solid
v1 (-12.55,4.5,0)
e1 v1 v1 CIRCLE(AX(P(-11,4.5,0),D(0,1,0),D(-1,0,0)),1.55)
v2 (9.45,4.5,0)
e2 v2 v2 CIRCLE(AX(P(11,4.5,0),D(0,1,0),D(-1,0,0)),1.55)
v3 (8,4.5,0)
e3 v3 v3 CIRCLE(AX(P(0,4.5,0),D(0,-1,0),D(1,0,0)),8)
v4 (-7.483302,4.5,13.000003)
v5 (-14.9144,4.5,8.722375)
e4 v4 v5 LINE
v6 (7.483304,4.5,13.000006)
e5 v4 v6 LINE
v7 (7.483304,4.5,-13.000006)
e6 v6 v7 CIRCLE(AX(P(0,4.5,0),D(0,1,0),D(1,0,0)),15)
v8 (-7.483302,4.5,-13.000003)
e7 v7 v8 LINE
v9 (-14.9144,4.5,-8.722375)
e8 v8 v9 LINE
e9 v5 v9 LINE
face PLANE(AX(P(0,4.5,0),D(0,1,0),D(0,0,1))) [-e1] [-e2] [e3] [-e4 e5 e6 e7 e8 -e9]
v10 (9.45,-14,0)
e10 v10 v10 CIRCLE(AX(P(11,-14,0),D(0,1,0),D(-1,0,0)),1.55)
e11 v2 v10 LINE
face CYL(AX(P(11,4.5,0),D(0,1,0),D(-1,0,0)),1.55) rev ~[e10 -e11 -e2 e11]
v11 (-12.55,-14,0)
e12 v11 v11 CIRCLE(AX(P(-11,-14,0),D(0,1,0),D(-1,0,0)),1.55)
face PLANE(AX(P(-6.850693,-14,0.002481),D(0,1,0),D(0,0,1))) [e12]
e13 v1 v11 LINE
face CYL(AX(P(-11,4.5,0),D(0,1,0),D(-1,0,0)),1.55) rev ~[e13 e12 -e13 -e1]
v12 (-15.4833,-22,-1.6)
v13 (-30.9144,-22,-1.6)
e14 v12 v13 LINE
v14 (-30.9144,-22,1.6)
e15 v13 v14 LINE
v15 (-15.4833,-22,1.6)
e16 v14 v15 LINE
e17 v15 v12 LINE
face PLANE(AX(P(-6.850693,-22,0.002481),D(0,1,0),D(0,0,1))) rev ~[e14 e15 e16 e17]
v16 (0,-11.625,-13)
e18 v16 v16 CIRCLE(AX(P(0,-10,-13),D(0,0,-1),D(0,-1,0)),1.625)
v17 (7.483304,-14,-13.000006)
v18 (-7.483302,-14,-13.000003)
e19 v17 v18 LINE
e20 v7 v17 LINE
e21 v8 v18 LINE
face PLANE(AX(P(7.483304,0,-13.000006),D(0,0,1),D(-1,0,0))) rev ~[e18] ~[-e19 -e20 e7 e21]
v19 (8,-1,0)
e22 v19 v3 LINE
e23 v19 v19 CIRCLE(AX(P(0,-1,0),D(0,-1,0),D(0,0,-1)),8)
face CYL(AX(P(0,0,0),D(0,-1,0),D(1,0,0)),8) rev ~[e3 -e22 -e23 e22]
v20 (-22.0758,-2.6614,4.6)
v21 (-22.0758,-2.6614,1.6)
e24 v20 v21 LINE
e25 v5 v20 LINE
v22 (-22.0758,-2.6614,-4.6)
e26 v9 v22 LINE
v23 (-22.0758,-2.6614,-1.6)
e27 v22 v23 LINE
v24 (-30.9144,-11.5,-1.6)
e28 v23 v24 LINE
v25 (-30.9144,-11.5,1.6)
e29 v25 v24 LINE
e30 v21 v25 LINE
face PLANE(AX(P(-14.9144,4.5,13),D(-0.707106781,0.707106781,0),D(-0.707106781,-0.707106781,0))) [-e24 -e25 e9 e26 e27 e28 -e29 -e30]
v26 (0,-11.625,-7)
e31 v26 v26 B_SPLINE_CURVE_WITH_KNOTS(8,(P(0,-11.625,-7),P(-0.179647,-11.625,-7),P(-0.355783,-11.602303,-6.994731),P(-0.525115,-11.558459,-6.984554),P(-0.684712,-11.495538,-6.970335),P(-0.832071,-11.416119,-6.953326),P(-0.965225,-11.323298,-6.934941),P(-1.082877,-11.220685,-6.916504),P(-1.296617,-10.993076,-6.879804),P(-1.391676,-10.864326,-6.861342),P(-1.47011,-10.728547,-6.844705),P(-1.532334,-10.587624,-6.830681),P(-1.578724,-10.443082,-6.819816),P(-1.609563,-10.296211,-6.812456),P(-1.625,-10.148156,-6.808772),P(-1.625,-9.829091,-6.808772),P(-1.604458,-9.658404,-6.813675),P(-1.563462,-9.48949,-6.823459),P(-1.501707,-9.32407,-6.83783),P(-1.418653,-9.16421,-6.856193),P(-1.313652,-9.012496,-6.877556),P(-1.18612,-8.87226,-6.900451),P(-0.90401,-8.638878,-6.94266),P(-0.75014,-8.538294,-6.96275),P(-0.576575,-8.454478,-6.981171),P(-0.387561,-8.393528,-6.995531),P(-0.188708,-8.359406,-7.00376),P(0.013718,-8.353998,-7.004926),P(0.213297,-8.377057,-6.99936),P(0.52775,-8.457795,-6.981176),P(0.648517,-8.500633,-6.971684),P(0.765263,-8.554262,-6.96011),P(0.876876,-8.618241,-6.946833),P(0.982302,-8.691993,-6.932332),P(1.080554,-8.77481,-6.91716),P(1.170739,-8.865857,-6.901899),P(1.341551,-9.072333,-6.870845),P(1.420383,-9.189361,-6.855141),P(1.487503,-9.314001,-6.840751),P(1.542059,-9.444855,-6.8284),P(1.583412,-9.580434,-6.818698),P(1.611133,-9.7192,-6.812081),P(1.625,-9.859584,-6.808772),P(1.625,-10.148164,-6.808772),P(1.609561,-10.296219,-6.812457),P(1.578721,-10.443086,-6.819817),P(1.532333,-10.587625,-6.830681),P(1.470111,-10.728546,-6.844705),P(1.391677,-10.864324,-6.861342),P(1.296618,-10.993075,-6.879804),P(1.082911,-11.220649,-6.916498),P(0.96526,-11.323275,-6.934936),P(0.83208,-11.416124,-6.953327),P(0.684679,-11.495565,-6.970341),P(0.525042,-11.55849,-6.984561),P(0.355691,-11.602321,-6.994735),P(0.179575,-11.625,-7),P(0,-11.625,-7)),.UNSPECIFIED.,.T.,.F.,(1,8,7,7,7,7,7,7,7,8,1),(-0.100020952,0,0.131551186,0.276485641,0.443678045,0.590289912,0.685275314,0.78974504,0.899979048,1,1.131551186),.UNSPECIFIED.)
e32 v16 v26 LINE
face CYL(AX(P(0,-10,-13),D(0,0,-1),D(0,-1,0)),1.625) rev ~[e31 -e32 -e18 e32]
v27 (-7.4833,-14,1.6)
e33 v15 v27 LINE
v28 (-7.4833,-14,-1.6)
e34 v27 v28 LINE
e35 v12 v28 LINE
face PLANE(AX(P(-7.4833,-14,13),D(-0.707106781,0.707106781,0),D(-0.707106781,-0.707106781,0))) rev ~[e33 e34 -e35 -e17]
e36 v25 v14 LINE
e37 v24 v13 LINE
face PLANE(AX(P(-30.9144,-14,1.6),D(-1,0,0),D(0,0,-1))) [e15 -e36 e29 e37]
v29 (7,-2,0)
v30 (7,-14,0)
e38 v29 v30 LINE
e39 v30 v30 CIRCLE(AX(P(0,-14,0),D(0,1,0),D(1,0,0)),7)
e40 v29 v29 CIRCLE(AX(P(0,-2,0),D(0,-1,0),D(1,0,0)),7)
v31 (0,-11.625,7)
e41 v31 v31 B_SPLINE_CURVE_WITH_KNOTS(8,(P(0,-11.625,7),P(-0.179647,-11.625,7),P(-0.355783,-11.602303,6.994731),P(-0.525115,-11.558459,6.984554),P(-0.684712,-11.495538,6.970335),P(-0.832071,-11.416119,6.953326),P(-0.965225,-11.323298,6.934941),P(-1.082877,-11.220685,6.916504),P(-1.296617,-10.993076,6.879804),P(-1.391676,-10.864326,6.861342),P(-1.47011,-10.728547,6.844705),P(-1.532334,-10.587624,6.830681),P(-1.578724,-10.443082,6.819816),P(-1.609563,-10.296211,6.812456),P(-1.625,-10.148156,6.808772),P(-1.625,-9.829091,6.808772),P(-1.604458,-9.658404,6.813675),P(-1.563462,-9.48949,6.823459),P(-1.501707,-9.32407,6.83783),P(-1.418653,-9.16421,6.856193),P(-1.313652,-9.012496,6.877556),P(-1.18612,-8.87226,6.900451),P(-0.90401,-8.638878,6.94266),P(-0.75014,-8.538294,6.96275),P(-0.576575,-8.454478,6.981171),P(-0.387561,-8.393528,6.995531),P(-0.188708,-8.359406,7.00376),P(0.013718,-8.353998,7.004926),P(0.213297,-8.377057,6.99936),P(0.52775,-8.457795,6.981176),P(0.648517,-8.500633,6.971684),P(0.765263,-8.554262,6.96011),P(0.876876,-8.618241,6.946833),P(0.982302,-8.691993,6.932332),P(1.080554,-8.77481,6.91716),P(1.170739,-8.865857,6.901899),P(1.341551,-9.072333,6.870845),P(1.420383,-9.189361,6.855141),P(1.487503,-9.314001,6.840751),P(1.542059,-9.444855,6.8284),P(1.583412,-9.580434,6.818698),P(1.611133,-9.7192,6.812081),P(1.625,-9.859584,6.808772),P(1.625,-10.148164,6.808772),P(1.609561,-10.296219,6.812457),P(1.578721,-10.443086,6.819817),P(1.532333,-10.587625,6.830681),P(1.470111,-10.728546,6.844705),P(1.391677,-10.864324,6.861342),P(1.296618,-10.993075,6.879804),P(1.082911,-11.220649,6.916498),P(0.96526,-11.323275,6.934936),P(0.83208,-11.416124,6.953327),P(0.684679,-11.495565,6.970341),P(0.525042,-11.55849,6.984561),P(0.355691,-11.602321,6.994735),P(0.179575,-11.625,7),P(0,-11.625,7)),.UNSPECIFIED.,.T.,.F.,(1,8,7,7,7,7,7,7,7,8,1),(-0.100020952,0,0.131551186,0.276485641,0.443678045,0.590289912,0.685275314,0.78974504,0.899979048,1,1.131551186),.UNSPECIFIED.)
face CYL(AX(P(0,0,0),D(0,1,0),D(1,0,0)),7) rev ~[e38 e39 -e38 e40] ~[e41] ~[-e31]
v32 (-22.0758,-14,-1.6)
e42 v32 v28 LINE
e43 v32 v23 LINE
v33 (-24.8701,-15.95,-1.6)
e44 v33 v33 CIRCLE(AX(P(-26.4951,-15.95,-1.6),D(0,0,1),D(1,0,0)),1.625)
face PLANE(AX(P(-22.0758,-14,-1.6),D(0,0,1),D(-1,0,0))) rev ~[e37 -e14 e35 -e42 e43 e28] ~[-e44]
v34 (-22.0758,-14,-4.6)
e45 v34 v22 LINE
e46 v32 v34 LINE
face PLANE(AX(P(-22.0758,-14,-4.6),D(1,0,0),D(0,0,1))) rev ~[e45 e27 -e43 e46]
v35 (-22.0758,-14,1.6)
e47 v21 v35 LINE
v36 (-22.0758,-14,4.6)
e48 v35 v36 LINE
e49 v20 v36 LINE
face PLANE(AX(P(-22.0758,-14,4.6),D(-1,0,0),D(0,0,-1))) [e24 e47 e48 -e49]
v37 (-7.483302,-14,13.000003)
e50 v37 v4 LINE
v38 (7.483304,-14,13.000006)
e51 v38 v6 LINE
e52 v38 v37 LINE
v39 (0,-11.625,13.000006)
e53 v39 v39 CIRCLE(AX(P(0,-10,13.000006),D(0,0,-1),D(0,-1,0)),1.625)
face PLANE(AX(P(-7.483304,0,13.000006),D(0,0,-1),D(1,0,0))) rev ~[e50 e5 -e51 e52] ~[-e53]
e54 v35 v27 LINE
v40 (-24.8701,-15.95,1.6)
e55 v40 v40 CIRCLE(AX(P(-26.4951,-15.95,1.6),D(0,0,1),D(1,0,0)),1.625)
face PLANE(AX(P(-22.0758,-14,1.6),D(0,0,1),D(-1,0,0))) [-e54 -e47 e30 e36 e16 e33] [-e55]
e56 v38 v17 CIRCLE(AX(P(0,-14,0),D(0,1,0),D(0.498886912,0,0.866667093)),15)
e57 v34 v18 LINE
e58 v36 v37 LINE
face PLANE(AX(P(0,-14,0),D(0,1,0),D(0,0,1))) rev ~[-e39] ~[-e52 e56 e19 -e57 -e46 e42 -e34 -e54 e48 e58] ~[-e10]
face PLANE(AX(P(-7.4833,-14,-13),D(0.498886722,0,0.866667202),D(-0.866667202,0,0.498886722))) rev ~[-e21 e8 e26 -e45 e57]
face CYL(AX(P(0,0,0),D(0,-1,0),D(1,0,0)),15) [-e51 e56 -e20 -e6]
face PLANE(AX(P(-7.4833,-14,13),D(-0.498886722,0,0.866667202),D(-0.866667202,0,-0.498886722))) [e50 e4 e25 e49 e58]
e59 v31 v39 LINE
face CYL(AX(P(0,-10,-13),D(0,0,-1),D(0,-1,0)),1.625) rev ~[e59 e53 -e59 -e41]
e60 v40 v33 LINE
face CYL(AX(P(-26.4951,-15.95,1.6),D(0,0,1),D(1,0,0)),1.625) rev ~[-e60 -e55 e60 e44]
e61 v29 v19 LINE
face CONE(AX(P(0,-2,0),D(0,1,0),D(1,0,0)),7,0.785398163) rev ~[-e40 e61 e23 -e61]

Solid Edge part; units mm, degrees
sketch "Sketch1" plane through (0, 0, 0) normal (0, -1, 0) x (1, 0, 0)
  arc A0 (-7.4833, -13) -> (-7.4833, 13) centre (0, 0) cw
  line L0 (-7.4833, 13) -> (7.4833, 13)
  arc A1 (7.4833, 13) -> (7.4833, -13) centre (0, 0) cw
  line L1 (7.4833, -13) -> (-7.4833, -13)
  circle A2 centre (0, 0) radius 8
extrude "Protrusion1" add sketch "Sketch1" against normal blind 4.5
sketch "Sketch2" plane through (0, 0, 0) normal (0, -1, 0) x (1, 0, 0)
  line L0 (-7.4833, 13) -> (7.4833, 13)
  line L1 (-7.4833, -13) -> (7.4833, -13)
  arc A0 (-7.4833, -13) -> (-7.4833, 13) centre (0, 0) cw
  arc A1 (7.4833, 13) -> (7.4833, -13) centre (0, 0) cw
  circle A2 centre (0, 0) radius 7
extrude "ExtrudedProtrusion_2" add sketch "Sketch2" along normal blind 14
sketch "Sketch3" plane through (0, -14, 0) normal (0, -1, 0) x (1, 0, 0)
  line L0 (-7.4833, 13) -> (-22.0758, 4.6)
  line L1 (-22.0758, 4.6) -> (-22.0758, 1.6)
  line L2 (-22.0758, 1.6) -> (-30.9144, 1.6)
  line L3 (-30.9144, 1.6) -> (-30.9144, -1.6)
  line L4 (-22.0758, -1.6) -> (-30.9144, -1.6)
  line L5 (-22.0758, -4.6) -> (-22.0758, -1.6)
  line L6 (-7.4833, -13) -> (-22.0758, -4.6)
  line L7 (-7.4833, 13) -> (7.4833, 13)
extrude "Protrusion2" add sketch "Sketch3" against normal up to vertex (18.5 mm away) material side at (-14.7546, -14, 8.7567)
sketch "Sketch4" plane through (-2.3218, 4.5, 0) normal (0, 1, 0) x (-1, 0, 0)
  circle A0 centre (-13.3218, 0) radius 1.55
  circle A1 centre (8.6782, 0) radius 1.55
extrude "ExtrudedCutout_7" cut sketch "Sketch4" against normal blind 24
chamfer "Chamfer_4" distance 2 angle 45 1 edges at (-7, 0, 0) measured on face at (-5.1733, 0, -5.4933)
sketch "Sketch5" plane through (0, -4.75, -13) normal (0, 0, -1) x (0, -1, 0)
  circle A0 centre (5.25, 0) radius 1.625
extrude "ExtrudedCutout_10" cut sketch "Sketch5" against normal blind 36
sketch "Sketch6" plane through (-7.9572, -14, 0) normal (0, -1, 0) x (1, 0, 0)
  line L0 (-14.1186, 4.6) -> (0.4739, 13)
  line L1 (0.4739, 13) -> (15.4405, 13)
  line L2 (0.4265, -12.9726) -> (15.4405, -13)
  line L3 (-14.1186, -4.6) -> (0.4265, -12.9726)
  line L4 (-14.1186, -4.6) -> (-14.1186, -1.6)
  line L5 (-22.9572, -1.6) -> (-14.1186, -1.6)
  line L6 (-22.9572, -1.6) -> (-22.9572, 1.6)
  line L7 (-22.9572, 1.6) -> (-14.1186, 1.6)
  line L8 (-14.1186, 4.6) -> (-14.1186, 1.6)
  arc A0 (15.4405, 13) -> (15.4405, -13) centre (7.9572, 0) cw
  circle A1 centre (7.9572, 0) radius 7
extrude "ExtrudedProtrusion_7" add sketch "Sketch6" along normal blind 8
sketch "Sketch7" plane through (0, -8.75, 13) normal (0, 0, 1) x (0, 1, 0)
  line L0 (-13.25, 15.4833) -> (-13.25, 7.4833)
  line L1 (-13.25, 7.4833) -> (-13.25, -15)
  line L2 (-13.25, -15) -> (-5.25, -15)
  line L3 (-5.25, -15) -> (-5.25, 7.4833)
  line L4 (-5.25, 7.4833) -> (-13.25, 15.4833)
  line L5 (13.25, 14.9144) -> (-2.75, 30.9144)
  line L6 (-2.75, 30.9144) -> (13.25, 30.9144)
  line L7 (13.25, 30.9144) -> (13.25, 14.9144)
extrude "ExtrudedCutout_15" cut sketch "Sketch7" against normal blind 35.2747
sketch "Sketch8" plane through (-26.4951, -12.3307, 1.6) normal (0, 0, 1) x (1, 0, 0)
  circle A0 centre (0, -3.6193) radius 1.625
extrude "ExtrudedCutout_18" cut sketch "Sketch8" against normal blind 7.2202
sketch "Sketch9" plane through (-22.0758, -12.3307, -3.1025) normal (-1, 0, 0) x (0, -1, 0)
  line L0 (9.6693, 4.7025) -> (1.6693, 4.7025)
  line L1 (1.6693, 4.7025) -> (1.6693, 16.1025)
  line L2 (1.6693, 16.1025) -> (9.6693, 16.1025)
  line L3 (9.6693, 16.1025) -> (9.6693, 4.7025)
  line L4 (9.6693, 1.5025) -> (1.6693, 1.5025)
  line L5 (1.6693, 1.5025) -> (1.6693, -9.8975)
  line L6 (1.6693, -9.8975) -> (9.6693, -9.8975)
  line L7 (9.6693, -9.8975) -> (9.6693, 1.5025)
extrude "ExtrudedCutout_19" cut sketch "Sketch9" against normal blind 19.6868
